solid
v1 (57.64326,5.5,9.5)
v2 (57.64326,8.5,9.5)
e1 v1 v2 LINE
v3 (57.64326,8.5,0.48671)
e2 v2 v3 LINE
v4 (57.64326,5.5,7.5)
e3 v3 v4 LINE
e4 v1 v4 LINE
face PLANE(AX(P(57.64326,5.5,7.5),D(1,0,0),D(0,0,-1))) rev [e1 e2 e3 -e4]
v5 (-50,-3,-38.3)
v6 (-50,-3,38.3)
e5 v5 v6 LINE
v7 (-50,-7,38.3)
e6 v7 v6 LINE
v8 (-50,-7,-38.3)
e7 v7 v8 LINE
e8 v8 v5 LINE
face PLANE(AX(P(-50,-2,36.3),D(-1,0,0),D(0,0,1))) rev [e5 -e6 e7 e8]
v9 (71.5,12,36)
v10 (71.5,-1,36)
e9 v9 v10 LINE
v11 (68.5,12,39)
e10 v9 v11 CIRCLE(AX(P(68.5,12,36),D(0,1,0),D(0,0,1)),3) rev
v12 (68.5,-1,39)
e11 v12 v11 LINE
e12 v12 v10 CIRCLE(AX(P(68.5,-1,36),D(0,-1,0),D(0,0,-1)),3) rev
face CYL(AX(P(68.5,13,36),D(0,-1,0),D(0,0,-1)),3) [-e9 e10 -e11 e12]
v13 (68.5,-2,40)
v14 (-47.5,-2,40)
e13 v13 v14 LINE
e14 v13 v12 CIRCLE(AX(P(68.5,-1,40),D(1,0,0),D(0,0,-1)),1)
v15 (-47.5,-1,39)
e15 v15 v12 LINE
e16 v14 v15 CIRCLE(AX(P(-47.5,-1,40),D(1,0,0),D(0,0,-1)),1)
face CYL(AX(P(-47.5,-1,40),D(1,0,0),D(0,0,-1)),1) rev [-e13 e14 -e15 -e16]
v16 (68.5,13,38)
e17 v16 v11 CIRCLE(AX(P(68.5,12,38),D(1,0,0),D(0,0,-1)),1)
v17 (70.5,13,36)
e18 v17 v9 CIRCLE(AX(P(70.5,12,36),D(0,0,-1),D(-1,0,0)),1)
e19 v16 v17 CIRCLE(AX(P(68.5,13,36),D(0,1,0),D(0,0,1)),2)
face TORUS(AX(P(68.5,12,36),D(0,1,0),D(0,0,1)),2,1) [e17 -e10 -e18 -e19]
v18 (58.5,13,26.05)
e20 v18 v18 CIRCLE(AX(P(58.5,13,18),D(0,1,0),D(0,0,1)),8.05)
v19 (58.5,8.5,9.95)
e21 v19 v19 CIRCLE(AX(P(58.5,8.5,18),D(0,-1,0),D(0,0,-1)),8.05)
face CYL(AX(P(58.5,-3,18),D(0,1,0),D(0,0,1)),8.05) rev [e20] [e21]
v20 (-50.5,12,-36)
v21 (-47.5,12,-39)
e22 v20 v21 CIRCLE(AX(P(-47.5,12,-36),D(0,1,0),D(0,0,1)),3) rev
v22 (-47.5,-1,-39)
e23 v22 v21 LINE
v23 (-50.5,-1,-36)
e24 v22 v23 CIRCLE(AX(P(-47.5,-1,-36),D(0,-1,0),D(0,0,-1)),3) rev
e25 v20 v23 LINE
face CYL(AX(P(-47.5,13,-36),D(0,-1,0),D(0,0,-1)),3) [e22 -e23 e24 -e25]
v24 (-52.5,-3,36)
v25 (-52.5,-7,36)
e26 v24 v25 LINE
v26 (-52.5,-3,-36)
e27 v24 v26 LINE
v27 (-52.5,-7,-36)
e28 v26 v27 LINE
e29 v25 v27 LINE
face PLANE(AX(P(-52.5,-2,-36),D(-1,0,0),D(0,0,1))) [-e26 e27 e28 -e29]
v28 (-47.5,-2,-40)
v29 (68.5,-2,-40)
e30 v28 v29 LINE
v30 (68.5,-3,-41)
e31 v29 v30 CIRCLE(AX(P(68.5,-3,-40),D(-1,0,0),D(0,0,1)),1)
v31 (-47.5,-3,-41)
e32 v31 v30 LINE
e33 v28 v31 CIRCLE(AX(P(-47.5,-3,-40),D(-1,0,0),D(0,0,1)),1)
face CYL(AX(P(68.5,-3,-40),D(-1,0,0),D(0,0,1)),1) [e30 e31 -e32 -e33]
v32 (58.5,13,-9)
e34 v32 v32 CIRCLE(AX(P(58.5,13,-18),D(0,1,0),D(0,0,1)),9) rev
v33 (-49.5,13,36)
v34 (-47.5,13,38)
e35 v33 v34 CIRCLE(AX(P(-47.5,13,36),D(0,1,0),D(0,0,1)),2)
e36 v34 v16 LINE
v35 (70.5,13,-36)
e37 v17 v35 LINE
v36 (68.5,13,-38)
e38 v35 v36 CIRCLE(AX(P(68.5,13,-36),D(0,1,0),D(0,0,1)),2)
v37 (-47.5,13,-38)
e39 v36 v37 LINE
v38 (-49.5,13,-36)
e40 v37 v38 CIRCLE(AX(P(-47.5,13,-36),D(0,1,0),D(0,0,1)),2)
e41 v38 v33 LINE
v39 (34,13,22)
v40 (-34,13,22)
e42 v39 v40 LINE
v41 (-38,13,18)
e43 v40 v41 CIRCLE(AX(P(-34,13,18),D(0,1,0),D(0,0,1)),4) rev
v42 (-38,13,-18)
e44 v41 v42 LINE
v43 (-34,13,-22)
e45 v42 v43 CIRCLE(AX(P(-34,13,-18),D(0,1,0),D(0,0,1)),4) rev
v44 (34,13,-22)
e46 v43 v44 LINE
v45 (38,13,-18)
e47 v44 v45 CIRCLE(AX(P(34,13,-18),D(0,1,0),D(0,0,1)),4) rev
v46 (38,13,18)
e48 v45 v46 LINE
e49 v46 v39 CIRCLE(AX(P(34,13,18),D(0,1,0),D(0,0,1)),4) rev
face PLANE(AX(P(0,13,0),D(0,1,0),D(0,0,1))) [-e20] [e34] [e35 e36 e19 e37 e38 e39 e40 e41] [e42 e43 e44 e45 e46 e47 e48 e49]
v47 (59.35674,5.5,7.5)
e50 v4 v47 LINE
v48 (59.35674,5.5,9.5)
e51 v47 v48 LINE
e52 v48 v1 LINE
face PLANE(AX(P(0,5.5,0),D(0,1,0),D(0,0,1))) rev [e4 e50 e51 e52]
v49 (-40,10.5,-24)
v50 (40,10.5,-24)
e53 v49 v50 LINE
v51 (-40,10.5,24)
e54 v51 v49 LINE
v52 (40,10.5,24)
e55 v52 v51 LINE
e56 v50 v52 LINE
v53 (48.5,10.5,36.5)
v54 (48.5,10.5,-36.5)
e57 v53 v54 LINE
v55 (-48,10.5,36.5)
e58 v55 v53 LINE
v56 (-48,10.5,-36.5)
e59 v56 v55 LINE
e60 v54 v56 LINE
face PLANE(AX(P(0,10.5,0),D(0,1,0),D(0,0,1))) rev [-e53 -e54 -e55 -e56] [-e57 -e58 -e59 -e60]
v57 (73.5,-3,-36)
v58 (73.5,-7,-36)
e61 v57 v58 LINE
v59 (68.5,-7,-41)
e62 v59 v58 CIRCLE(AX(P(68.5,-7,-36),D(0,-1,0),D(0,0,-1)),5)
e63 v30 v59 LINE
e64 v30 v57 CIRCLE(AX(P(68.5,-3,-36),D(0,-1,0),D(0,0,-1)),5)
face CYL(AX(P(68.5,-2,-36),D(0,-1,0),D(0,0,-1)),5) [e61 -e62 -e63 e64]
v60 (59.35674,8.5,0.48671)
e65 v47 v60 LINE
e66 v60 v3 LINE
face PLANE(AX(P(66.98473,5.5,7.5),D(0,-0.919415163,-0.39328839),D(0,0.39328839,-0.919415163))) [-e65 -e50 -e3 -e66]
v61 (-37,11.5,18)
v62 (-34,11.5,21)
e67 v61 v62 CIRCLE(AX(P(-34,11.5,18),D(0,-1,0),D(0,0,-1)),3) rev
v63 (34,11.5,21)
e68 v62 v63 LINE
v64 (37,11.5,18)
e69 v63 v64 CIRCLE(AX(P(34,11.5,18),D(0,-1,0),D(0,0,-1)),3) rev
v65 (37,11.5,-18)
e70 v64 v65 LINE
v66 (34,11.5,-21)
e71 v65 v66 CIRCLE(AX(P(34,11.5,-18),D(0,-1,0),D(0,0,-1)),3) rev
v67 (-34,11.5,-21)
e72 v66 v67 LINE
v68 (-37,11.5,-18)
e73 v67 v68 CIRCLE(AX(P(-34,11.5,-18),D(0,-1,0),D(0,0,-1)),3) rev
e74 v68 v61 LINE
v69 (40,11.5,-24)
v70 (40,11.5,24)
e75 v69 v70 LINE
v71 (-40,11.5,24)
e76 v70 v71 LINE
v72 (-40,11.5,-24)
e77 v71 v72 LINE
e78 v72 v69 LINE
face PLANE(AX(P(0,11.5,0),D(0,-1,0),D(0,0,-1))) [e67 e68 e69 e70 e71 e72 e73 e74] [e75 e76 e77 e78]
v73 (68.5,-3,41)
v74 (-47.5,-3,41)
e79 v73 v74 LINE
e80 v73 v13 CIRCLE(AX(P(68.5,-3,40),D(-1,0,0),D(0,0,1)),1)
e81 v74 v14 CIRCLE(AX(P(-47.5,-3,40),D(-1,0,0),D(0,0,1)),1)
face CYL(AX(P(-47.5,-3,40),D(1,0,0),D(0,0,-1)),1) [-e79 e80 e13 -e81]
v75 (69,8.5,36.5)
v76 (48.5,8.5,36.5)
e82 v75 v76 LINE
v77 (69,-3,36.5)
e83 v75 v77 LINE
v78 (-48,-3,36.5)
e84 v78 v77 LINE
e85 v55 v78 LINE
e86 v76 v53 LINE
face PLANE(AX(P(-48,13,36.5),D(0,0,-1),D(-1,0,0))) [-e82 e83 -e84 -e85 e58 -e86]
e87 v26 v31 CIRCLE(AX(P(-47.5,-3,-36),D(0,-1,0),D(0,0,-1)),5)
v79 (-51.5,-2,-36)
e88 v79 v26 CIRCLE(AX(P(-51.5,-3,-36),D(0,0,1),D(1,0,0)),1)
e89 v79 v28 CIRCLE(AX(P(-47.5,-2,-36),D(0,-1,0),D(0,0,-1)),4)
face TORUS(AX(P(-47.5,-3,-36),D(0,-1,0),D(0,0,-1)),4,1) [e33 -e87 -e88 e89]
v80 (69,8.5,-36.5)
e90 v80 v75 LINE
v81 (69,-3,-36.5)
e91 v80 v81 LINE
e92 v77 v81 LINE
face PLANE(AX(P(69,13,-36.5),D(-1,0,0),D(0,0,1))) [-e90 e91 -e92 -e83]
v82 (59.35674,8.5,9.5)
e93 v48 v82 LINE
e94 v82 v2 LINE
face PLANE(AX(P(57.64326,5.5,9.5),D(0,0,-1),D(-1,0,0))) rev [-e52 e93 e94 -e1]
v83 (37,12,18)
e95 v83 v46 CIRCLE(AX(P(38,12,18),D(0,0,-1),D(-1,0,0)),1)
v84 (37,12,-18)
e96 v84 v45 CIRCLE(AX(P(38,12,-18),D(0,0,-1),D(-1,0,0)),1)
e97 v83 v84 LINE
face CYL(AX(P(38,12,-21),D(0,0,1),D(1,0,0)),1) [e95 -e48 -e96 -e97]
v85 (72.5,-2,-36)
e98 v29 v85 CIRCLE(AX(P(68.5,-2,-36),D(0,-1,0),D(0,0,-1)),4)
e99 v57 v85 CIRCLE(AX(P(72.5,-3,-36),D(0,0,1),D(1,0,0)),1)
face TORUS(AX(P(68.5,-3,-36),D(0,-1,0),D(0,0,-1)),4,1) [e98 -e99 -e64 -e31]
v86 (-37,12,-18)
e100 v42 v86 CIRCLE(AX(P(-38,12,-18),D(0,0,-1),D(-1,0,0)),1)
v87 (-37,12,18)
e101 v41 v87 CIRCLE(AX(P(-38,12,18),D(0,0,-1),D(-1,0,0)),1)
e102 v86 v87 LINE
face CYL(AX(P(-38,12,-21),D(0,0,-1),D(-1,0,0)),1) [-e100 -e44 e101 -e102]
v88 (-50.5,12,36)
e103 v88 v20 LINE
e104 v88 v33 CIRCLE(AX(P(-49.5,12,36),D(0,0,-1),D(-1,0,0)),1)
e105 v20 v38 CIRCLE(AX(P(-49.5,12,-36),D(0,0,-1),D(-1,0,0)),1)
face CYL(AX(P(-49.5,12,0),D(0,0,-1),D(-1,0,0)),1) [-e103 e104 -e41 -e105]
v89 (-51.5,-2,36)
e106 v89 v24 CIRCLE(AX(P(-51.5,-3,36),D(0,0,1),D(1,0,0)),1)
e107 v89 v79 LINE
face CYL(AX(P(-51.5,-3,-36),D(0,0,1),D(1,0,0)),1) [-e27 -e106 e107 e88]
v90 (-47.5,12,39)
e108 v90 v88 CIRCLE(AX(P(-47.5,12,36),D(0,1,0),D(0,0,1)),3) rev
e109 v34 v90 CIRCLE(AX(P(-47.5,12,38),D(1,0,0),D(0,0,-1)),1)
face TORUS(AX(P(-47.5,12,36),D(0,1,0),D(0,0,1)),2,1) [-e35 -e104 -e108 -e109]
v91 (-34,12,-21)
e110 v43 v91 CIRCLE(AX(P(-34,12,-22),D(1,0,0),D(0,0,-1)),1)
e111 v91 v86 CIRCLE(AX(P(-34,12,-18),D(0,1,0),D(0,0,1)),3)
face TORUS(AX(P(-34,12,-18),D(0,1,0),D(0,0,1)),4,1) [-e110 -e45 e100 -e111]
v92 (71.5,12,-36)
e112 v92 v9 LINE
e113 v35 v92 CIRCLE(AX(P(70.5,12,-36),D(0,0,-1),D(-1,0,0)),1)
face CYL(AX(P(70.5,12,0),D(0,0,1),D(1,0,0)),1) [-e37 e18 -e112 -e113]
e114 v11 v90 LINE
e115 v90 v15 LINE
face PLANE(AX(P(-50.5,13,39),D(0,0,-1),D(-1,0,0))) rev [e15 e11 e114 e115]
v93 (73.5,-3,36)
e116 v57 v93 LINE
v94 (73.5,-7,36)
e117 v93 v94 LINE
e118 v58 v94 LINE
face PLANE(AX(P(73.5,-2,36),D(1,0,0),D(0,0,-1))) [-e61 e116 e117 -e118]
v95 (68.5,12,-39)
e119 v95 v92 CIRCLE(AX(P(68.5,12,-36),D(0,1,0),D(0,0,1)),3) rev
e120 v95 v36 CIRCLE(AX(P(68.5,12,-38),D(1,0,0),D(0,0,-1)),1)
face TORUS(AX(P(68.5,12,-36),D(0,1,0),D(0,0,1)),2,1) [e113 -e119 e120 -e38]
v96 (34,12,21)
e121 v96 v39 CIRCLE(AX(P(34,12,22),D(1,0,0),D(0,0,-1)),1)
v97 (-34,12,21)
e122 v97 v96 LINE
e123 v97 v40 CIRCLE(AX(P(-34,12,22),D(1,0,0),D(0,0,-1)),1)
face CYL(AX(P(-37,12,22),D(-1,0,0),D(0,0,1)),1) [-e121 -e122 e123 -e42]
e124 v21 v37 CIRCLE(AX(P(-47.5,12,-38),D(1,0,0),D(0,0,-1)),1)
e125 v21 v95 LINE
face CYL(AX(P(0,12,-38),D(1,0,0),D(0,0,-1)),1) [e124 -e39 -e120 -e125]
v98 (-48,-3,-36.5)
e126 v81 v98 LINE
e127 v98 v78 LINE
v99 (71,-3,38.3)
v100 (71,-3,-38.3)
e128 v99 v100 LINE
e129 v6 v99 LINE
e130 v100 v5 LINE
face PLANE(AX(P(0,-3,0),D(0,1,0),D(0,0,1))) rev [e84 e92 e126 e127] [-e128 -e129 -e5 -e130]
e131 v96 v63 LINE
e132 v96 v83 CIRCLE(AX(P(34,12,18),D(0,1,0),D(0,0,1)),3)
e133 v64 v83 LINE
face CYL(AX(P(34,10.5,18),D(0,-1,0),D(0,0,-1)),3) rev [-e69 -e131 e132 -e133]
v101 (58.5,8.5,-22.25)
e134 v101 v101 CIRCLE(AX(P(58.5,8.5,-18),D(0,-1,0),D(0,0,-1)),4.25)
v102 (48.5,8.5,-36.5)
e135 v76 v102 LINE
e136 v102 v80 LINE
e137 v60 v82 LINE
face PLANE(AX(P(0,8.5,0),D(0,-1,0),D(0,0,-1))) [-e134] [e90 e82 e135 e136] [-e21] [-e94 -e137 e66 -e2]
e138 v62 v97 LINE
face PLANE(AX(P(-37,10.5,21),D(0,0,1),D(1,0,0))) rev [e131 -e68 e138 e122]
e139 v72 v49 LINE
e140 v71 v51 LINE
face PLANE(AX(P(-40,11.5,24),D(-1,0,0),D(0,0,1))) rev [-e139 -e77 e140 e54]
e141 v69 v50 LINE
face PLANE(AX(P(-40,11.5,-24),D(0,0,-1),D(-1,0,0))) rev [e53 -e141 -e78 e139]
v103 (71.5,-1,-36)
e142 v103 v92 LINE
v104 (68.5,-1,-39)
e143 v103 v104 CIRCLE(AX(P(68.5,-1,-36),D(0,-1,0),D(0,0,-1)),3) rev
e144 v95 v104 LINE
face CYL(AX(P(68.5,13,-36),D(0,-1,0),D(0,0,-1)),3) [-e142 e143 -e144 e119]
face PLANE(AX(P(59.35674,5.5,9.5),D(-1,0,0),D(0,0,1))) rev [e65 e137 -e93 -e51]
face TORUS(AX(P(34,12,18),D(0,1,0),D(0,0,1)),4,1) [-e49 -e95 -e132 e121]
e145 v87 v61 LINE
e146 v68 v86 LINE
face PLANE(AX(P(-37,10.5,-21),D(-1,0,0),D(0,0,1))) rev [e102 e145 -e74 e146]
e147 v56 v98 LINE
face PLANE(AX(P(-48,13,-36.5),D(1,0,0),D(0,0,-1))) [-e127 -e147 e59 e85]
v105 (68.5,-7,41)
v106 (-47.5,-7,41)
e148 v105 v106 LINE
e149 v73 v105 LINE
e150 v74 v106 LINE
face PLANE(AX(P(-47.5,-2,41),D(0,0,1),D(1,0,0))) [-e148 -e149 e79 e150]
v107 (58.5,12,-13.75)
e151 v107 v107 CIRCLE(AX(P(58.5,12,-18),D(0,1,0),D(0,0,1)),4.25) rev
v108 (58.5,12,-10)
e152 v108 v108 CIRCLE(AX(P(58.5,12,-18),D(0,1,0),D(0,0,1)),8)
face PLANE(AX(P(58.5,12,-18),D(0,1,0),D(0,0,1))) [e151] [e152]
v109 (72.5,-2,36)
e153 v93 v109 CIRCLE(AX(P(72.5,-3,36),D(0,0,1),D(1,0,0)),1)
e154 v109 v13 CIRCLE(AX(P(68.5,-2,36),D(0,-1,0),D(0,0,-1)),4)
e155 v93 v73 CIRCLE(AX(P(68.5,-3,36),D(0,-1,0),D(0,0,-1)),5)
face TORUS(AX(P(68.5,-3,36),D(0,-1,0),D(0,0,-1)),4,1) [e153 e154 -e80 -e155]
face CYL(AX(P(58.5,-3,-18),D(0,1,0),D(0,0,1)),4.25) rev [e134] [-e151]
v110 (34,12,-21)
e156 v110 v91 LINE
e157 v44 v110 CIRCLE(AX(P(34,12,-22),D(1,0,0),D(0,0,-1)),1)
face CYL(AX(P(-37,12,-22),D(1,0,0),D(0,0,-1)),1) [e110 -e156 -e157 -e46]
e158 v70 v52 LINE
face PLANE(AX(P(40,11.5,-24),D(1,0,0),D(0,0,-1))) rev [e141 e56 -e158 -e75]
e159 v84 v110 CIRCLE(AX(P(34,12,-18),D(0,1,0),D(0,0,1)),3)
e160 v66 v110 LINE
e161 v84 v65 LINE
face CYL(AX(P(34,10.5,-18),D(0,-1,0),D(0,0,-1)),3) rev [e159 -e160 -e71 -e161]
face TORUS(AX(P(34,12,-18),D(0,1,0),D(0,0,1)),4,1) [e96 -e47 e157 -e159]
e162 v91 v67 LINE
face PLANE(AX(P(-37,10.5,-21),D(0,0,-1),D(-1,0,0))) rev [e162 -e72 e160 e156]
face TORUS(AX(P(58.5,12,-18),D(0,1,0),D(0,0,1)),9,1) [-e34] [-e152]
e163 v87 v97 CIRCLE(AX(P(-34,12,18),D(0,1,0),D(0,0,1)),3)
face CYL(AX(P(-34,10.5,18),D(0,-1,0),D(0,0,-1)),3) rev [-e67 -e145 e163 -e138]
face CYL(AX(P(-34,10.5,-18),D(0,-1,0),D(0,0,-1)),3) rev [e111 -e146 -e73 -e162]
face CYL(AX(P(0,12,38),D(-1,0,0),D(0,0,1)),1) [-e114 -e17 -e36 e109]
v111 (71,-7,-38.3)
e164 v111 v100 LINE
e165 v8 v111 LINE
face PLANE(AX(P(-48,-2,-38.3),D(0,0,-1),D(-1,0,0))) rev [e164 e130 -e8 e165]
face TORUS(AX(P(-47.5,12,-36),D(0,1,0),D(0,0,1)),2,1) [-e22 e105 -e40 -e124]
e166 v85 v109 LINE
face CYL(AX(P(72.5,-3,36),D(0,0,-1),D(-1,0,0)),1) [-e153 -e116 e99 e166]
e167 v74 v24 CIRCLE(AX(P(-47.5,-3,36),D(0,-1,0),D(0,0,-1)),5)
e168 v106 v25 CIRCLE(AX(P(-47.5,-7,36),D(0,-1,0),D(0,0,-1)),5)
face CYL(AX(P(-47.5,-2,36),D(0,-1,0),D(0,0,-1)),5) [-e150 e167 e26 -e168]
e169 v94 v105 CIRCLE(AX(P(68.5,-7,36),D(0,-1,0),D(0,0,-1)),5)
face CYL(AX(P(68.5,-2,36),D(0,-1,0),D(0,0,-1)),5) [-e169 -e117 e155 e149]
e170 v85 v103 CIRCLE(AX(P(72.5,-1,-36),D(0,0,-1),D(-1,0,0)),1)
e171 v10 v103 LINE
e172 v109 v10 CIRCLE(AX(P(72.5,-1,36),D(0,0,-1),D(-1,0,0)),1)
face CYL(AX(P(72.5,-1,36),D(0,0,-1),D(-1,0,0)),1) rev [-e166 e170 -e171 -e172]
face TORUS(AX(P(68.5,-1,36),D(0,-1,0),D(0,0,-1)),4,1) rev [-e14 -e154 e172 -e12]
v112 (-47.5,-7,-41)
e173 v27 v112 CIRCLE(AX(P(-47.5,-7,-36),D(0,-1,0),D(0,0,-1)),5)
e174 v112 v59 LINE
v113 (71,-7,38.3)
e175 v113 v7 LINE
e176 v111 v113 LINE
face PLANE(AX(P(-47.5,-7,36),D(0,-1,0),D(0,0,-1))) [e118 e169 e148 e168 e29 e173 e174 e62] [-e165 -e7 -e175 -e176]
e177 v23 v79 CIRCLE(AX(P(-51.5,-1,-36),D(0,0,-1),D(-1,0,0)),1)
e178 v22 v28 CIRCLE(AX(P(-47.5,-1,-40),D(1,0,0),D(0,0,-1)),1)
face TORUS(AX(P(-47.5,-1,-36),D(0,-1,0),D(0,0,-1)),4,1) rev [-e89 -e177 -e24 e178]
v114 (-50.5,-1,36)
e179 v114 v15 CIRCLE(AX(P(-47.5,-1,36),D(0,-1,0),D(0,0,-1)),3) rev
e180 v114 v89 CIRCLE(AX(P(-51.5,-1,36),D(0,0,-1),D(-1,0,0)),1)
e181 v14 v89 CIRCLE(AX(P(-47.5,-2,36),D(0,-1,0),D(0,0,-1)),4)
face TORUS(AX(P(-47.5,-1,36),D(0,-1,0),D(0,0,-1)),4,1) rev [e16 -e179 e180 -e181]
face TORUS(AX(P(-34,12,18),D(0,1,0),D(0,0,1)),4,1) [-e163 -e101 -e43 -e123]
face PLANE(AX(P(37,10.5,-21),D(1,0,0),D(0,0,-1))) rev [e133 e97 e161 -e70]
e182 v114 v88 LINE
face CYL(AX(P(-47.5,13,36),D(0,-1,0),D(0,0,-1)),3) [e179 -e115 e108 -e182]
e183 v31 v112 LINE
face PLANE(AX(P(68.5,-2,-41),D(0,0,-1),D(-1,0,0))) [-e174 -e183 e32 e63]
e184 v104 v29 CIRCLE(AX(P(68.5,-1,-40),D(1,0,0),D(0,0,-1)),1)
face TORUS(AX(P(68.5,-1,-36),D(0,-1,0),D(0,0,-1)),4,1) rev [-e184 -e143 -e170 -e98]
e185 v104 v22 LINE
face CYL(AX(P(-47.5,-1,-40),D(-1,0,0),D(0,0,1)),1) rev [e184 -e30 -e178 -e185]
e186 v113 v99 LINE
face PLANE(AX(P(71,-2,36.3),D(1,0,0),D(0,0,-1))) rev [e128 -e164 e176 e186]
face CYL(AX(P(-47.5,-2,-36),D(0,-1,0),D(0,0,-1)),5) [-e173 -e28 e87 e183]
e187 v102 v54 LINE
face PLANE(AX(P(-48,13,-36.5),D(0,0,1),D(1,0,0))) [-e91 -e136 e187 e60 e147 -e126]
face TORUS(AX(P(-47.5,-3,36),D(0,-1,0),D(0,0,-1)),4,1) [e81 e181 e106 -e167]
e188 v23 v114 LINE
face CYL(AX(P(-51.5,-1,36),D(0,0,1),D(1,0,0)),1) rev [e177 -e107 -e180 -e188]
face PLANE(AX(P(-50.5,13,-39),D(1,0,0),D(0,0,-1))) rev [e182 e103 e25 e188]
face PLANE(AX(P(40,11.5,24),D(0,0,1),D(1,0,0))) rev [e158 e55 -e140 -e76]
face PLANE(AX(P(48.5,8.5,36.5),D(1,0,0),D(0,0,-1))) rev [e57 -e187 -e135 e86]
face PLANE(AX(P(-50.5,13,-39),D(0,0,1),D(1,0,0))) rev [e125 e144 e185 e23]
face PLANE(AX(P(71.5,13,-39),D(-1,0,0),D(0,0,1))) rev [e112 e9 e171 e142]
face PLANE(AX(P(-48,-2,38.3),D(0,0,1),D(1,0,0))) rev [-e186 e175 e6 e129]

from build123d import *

# Parameters (mm, degrees)
SKETCH1_W                = 122
SKETCH1_H                = 78
SKETCH1_W_2              = 117
SKETCH1_H_2              = 73
BOSS_EXTRUDE1_DEPTH      = 16
SKETCH2_W                = 122
SKETCH2_H                = 78
SKETCH2_W_2              = 74
SKETCH2_H_2              = 42
BOSS_EXTRUDE2_DEPTH      = 2.5
SKETCH3_W                = 80
SKETCH3_H                = 48
CUT_EXTRUDE1_DEPTH       = 1
FILLET1_R                = 3
SKETCH4_R                = 4.25
SKETCH4_R_2              = 8.05
CUT_EXTRUDE2_DEPTH       = 84.00150601
SKETCH5_W                = 20.5
SKETCH5_H                = 73
SKETCH5_R                = 4.25
SKETCH5_R_2              = 8.05
BOSS_EXTRUDE3_DEPTH      = 2
SKETCH6_R                = 8
CUT_EXTRUDE3_DEPTH       = 1
FILLET2_R                = 3
SKETCH7_W                = 1.713480086
SKETCH7_H                = 2
BOSS_EXTRUDE4_DEPTH      = 3
BOSS_EXTRUDE5_DEPTH      = 1.713480086
FILLET3_R                = 1
FILLET4_R                = 1
FILLET5_R                = 1
BOSS_EXTRUDE6_DEPTH      = 4
BOSS_EXTRUDE6_DEPTH_BACK = 1
SKETCH10_W               = 121
SKETCH10_H               = 76.6
CUT_EXTRUDE4_DEPTH       = 86.669422783
FILLET10_R               = 1


with BuildPart() as part:
    # Sketch1 → Boss-Extrude1 (new body)
    with BuildSketch(Plane(origin=(0, -3, 0), x_dir=(1, 0, 0), z_dir=(0, 1, 0))):
        with Locations((10.5, 0)):
            Rectangle(SKETCH1_W, SKETCH1_H)
        with Locations((10.5, 0)):
            Rectangle(SKETCH1_W_2, SKETCH1_H_2, mode=Mode.SUBTRACT)
    extrude(amount=BOSS_EXTRUDE1_DEPTH)

    # Sketch2 → Boss-Extrude2 (add)
    with BuildSketch(Plane(origin=(0, 13, 0), x_dir=(1, 0, 0), z_dir=(0, 1, 0))):
        with Locations((10.5, 0)):
            Rectangle(SKETCH2_W, SKETCH2_H)
        Rectangle(SKETCH2_W_2, SKETCH2_H_2, mode=Mode.SUBTRACT)
    extrude(amount=-BOSS_EXTRUDE2_DEPTH)

    # Sketch3 → Cut-Extrude1 (cut)
    with BuildSketch(Plane.XZ.offset(-10.5)):
        Rectangle(SKETCH3_W, SKETCH3_H)
    extrude(amount=-CUT_EXTRUDE1_DEPTH, mode=Mode.SUBTRACT)

    # Fillet1
    fillet1_edges = [part.edges().sort_by_distance(p)[0] for p in [
        (-50.5, 5, -39),
        (71.5, 5, -39),
        (71.5, 5, 39),
        (-50.5, 5, 39),
    ]]
    fillet(fillet1_edges, radius=FILLET1_R)

    # Sketch4 → Cut-Extrude2 (cut, through all)
    with BuildSketch(Plane(origin=(0, 13, 0), x_dir=(1, 0, 0), z_dir=(0, 1, 0))):
        with Locations(Location((58.5, 18, 0), (0, 0, 270))):
            Circle(SKETCH4_R)
        with Locations(Location((58.5, -18, 0), (0, 0, 270))):
            Circle(SKETCH4_R_2)
    extrude(amount=-CUT_EXTRUDE2_DEPTH, mode=Mode.SUBTRACT)

    # Sketch5 → Boss-Extrude3 (add)
    with BuildSketch(Plane.XZ.offset(-10.5)):
        with Locations((58.75, 0)):
            Rectangle(SKETCH5_W, SKETCH5_H)
        with Locations(Location((58.5, -18, 0), (0, 0, 90))):
            Circle(SKETCH5_R, mode=Mode.SUBTRACT)
        with Locations(Location((58.5, 18, 0), (0, 0, 90))):
            Circle(SKETCH5_R_2, mode=Mode.SUBTRACT)
    extrude(amount=BOSS_EXTRUDE3_DEPTH)

    # Sketch6 → Cut-Extrude3 (cut)
    with BuildSketch(Plane(origin=(0, 13, 0), x_dir=(1, 0, 0), z_dir=(0, 1, 0))):
        with Locations(Location((58.5, 18, 0), (0, 0, 270))):
            Circle(SKETCH6_R)
    extrude(amount=-CUT_EXTRUDE3_DEPTH, mode=Mode.SUBTRACT)

    # Fillet2
    fillet2_edges = [part.edges().sort_by_distance(p)[0] for p in [
        (37, 12.25, 21),
        (-37, 12.25, 21),
        (37, 12.25, -21),
        (-37, 12.25, -21),
    ]]
    fillet(fillet2_edges, radius=FILLET2_R)

    # Sketch7 → Boss-Extrude4 (add)
    with BuildSketch(Plane.XZ.offset(-8.5)):
        with Locations((58.5, 8.5)):
            Rectangle(SKETCH7_W, SKETCH7_H)
    extrude(amount=BOSS_EXTRUDE4_DEPTH)

    # Sketch8 → Boss-Extrude5 (add)
    with BuildSketch(Plane.ZY.offset(-57.643259957)):
        Polygon((7.5, 5.5), (0.486710099, 8.5), (7.5, 8.5), align=None)
    extrude(amount=-BOSS_EXTRUDE5_DEPTH)

    # Fillet3
    fillet3_edges = [part.edges().sort_by_distance(p)[0] for p in [
        (-50.5, 13, 0),
        (10.5, 13, -39),
        (10.5, 13, 39),
        (71.5, 13, 0),
        (70.621320344, 13, 38.121320344),
        (70.621320344, 13, -38.121320344),
        (-49.621320344, 13, 38.121320344),
        (-49.621320344, 13, -38.121320344),
    ]]
    fillet(fillet3_edges, radius=FILLET3_R)

    # Fillet4
    fillet4_edges = [part.edges().sort_by_distance(p)[0] for p in [
        (37, 13, 0),
        (0, 13, 21),
        (-37, 13, 0),
        (0, 13, -21),
        (36.121320344, 13, 20.121320344),
        (-36.121320344, 13, 20.121320344),
        (-36.121320344, 13, -20.121320344),
        (36.121320344, 13, -20.121320344),
    ]]
    fillet(fillet4_edges, radius=FILLET4_R)

    # Fillet5
    fillet5_edges = [part.edges().sort_by_distance(p)[0] for p in [
        (58.5, 13, -26),
    ]]
    fillet(fillet5_edges, radius=FILLET5_R - 0.0001)  # a hair under: the kernel refuses the full size

    # Sketch9 → Boss-Extrude6 (add, two sides: drawn at the far end of the back side and taken through both)
    with BuildSketch(Plane.XZ.offset(3).offset(-BOSS_EXTRUDE6_DEPTH_BACK)):
        with BuildLine():
            Line((-52.5, -36), (-52.5, 36))
            ThreePointArc((-52.5, 36), (-51.035533906, 39.535533906), (-47.5, 41))
            Line((-47.5, 41), (68.5, 41))
            ThreePointArc((68.5, 41), (72.035533906, 39.535533906), (73.5, 36))
            Line((73.5, 36), (73.5, -36))
            ThreePointArc((73.5, -36), (72.035533906, -39.535533906), (68.5, -41))
            Line((68.5, -41), (-47.5, -41))
            ThreePointArc((-47.5, -41), (-51.035533906, -39.535533906), (-52.5, -36))
        make_face()
        with BuildLine():
            Line((-48, 38.3), (69, 38.3))
            ThreePointArc((69, 38.3), (70.414213562, 37.714213562), (71, 36.3))
            Line((71, 36.3), (71, -36.3))
            ThreePointArc((71, -36.3), (70.414213562, -37.714213562), (69, -38.3))
            Line((69, -38.3), (-48, -38.3))
            ThreePointArc((-48, -38.3), (-49.414213562, -37.714213562), (-50, -36.3))
            Line((-50, -36.3), (-50, 36.3))
            ThreePointArc((-50, 36.3), (-49.414213562, 37.714213562), (-48, 38.3))
        make_face(mode=Mode.SUBTRACT)
    extrude(amount=BOSS_EXTRUDE6_DEPTH + BOSS_EXTRUDE6_DEPTH_BACK)

    # Sketch10 → Cut-Extrude4 (cut, through all)
    with BuildSketch(Plane.XZ.offset(3)):
        with Locations((10.5, 0)):
            Rectangle(SKETCH10_W, SKETCH10_H)
    extrude(amount=CUT_EXTRUDE4_DEPTH, mode=Mode.SUBTRACT)

    # Fillet10
    fillet10_edges = [part.edges().sort_by_distance(p)[0] for p in [
        (70.621320344, -2, 38.121320344),
        (-49.621320344, -2, -38.121320344),
        (-49.621320344, -2, 38.121320344),
        (70.621320344, -2, -38.121320344),
        (-51.035533906, -2, 39.535533906),
        (10.5, -2, 41),
        (72.035533906, -2, 39.535533906),
        (73.5, -2, 0),
        (72.035533906, -2, -39.535533906),
        (10.5, -2, -41),
        (-51.035533906, -2, -39.535533906),
        (-52.5, -2, 0),
        (10.5, -2, -39),
        (71.5, -2, 0),
        (10.5, -2, 39),
        (-50.5, -2, 0),
    ]]
    fillet(fillet10_edges, radius=FILLET10_R - 0.0001)  # a hair under: the kernel refuses the full size


solid = part.part
